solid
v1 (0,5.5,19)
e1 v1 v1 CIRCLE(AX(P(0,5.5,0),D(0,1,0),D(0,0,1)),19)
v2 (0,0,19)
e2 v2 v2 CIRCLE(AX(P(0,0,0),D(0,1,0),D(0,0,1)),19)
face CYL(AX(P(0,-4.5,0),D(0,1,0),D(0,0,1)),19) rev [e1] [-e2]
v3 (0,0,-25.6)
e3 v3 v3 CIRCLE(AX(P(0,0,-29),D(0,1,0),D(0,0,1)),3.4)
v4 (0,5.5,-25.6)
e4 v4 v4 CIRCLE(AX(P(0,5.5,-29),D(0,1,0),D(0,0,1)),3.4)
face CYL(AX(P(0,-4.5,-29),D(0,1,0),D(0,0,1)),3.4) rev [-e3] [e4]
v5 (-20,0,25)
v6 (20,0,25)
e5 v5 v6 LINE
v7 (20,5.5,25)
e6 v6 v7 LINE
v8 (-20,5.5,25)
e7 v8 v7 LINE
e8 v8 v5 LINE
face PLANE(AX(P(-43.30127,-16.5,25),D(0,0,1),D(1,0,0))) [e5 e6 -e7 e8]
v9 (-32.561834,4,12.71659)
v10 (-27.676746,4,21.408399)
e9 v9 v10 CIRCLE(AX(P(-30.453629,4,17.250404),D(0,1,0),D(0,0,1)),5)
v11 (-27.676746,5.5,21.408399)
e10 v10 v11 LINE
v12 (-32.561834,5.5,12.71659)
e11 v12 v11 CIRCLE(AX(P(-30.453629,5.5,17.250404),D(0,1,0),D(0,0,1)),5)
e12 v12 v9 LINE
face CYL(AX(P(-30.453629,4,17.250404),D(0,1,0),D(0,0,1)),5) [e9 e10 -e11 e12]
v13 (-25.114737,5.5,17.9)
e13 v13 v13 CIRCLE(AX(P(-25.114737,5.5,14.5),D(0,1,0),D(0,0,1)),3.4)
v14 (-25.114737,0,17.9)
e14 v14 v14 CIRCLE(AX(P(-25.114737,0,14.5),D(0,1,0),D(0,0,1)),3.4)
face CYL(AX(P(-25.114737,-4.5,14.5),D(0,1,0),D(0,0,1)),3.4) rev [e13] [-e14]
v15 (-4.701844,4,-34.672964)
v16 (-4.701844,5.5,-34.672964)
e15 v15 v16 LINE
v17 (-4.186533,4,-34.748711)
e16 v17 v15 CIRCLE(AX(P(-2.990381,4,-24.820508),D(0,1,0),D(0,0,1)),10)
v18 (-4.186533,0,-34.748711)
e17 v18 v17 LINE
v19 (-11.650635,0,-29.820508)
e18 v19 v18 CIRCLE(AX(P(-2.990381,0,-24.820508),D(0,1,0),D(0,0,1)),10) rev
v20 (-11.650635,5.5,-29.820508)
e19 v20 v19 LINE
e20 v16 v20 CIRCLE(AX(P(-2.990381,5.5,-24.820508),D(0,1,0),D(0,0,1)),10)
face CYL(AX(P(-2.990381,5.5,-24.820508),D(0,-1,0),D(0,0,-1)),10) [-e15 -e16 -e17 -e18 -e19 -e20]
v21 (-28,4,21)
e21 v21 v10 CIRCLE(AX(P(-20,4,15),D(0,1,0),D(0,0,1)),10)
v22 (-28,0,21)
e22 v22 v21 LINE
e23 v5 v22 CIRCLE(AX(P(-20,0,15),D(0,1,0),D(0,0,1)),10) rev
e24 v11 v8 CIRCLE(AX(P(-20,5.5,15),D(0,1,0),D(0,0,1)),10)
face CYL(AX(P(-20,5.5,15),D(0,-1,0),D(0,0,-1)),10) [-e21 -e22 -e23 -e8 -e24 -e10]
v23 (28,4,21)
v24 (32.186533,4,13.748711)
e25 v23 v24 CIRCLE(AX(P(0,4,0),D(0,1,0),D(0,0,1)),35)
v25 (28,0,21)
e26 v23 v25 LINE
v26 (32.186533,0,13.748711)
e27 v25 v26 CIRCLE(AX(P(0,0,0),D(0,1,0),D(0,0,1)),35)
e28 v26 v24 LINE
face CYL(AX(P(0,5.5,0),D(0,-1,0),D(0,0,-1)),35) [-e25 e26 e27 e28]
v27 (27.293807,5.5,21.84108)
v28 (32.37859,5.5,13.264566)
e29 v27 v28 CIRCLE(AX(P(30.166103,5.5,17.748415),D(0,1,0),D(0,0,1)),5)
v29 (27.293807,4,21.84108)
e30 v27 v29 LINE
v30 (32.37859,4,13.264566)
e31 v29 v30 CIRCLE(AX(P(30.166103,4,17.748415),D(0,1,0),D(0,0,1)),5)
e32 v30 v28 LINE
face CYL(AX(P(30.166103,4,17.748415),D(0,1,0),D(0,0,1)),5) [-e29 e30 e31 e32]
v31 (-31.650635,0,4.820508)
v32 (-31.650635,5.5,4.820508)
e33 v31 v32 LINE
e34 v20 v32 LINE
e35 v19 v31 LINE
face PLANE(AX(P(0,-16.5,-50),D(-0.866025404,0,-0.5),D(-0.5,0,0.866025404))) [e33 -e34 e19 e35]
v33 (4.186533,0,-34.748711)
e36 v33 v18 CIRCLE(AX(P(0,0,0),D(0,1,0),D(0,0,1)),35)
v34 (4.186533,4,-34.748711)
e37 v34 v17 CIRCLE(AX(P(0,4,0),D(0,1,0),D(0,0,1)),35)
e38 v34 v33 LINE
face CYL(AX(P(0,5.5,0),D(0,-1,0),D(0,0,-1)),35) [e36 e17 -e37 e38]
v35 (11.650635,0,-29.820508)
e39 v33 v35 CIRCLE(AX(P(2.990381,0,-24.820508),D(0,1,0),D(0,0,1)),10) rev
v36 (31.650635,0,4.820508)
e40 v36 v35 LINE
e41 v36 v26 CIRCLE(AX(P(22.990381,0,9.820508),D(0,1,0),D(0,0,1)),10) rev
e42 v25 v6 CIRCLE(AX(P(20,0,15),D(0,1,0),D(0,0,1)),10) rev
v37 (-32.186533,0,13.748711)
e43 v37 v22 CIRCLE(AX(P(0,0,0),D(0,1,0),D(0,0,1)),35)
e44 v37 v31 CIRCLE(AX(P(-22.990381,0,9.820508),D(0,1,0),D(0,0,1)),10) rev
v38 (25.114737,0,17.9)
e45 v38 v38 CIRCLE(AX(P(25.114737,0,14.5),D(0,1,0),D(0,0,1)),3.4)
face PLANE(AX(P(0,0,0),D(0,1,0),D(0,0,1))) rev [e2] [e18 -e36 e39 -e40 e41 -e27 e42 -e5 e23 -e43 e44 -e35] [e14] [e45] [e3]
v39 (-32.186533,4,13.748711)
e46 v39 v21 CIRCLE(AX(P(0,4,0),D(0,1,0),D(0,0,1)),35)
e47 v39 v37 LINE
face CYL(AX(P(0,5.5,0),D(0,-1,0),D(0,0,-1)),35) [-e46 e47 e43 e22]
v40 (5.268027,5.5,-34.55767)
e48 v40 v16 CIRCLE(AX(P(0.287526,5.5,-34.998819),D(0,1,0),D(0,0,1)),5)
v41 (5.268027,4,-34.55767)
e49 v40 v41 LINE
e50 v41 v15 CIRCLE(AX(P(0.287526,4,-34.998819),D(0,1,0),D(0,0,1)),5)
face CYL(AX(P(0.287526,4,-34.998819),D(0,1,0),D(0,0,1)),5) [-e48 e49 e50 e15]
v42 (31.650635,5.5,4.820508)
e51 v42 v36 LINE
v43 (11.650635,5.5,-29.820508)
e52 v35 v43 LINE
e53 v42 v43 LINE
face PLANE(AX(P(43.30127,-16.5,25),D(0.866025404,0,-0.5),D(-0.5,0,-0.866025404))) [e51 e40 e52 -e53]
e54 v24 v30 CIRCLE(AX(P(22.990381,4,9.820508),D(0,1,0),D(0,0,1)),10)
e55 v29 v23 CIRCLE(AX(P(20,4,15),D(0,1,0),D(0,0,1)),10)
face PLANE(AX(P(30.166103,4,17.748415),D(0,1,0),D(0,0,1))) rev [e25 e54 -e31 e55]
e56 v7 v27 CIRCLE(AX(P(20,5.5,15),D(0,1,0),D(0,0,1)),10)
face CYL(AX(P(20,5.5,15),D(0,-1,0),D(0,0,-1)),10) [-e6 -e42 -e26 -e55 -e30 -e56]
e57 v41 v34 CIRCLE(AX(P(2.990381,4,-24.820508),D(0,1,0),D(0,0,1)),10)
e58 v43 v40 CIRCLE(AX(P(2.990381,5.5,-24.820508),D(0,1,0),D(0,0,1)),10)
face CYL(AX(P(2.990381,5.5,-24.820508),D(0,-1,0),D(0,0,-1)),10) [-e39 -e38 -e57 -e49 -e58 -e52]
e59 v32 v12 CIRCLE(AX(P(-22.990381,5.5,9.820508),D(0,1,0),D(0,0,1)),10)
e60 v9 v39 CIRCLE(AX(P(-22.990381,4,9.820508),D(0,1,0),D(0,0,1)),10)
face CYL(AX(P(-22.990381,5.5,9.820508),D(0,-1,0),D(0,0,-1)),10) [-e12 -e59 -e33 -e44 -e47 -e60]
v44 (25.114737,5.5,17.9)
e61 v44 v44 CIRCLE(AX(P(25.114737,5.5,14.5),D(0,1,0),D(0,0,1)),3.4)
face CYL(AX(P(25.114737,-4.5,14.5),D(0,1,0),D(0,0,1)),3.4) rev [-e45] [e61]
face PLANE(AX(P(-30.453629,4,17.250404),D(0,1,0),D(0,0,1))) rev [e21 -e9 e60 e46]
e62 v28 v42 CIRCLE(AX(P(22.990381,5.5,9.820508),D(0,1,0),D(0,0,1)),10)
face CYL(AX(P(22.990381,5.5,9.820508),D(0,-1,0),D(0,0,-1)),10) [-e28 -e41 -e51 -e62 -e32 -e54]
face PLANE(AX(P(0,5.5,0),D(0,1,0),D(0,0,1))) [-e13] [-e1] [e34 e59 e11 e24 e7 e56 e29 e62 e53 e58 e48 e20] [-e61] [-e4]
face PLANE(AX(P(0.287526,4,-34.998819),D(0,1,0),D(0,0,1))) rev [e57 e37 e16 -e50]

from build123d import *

# Parameters (mm, degrees)
SKETCH1_R                = 17.5
BOSS_EXTRUDE1_DEPTH      = 5.5
SKETCH2_R                = 35
SKETCH2_R_2              = 17.5
SKETCH2_R_3              = 2.8
BOSS_EXTRUDE2_DEPTH      = 5.5
BOSS_EXTRUDE3_DEPTH      = 2
BOSS_EXTRUDE3_DEPTH_BACK = 5.5
SKETCH4_R                = 2.9
SKETCH5_R                = 5
BOSS_EXTRUDE4_DEPTH      = 1.5
SKETCH3_R                = 17.5
CUT_EXTRUDE1_DEPTH       = 10
SKETCH12_R               = 72.135852014
CUT_EXTRUDE2_DEPTH       = 22
FILLET1_R                = 10
SKETCH13_R               = 3.4
CUT_EXTRUDE3_DEPTH       = 10
SKETCH14_R               = 19
CUT_EXTRUDE4_DEPTH       = 10


with BuildPart() as part:
    # Sketch1 → Boss-Extrude1 (new body)
    with BuildSketch(Plane(origin=(0, 0, 0), x_dir=(1, 0, 0), z_dir=(0, 1, 0))):
        with Locations(Location((0, 0, 0), (0, 0, 270))):
            Circle(SKETCH1_R)
    extrude(amount=BOSS_EXTRUDE1_DEPTH)

    # Sketch2 → Boss-Extrude2 (add)
    with BuildSketch(Plane(origin=(0, 0, 0), x_dir=(1, 0, 0), z_dir=(0, 1, 0))):
        with Locations(Location((0, 0, 0), (0, 0, 270))):
            Circle(SKETCH2_R)
        Circle(SKETCH2_R_2, mode=Mode.SUBTRACT)
        with Locations(Location((0, 29, 0), (0, 0, 270))):
            Circle(SKETCH2_R_3, mode=Mode.SUBTRACT)
        with Locations(Location((25.11473671, -14.5, 0), (0, 0, 270))):
            Circle(SKETCH2_R_3, mode=Mode.SUBTRACT)
        with Locations(Location((-25.11473671, -14.5, 0), (0, 0, 270))):
            Circle(SKETCH2_R_3, mode=Mode.SUBTRACT)
    extrude(amount=BOSS_EXTRUDE2_DEPTH)

    # Sketch4 → Boss-Extrude3 (add, two sides: drawn at the far end of the back side and taken through both)
    with BuildSketch(Plane.XZ.offset(-BOSS_EXTRUDE3_DEPTH_BACK)):
        with Locations(Location((-25.11473671, 14.5, 0), (0, 0, 270))):
            Circle(SKETCH4_R)
        with Locations(Location((25.11473671, 14.5, 0), (0, 0, 270))):
            Circle(SKETCH4_R)
        with Locations(Location((0, -29, 0), (0, 0, 270))):
            Circle(SKETCH4_R)
    extrude(amount=BOSS_EXTRUDE3_DEPTH + BOSS_EXTRUDE3_DEPTH_BACK)

    # Sketch5 → Boss-Extrude4 (add)
    with BuildSketch(Plane(origin=(0, 5.5, 0), x_dir=(1, 0, 0), z_dir=(0, 1, 0))):
        with Locations((-30.453629482, -17.250404383)):
            Circle(SKETCH5_R)
        with Locations((0.28752632, 34.99881896)):
            Circle(SKETCH5_R)
        with Locations((30.166103162, -17.748414577)):
            Circle(SKETCH5_R)
    extrude(amount=-BOSS_EXTRUDE4_DEPTH)

    # Sketch3 → Cut-Extrude1 (cut)
    with BuildSketch(Plane(origin=(0, 5.5, 0), x_dir=(1, 0, 0), z_dir=(0, 1, 0))):
        with Locations(Location((0, 0, 0), (0, 0, 270))):
            Circle(SKETCH3_R)
    extrude(amount=-CUT_EXTRUDE1_DEPTH, mode=Mode.SUBTRACT)

    # Sketch12 → Cut-Extrude2 (cut)
    with BuildSketch(Plane(origin=(0, 5.5, 0), x_dir=(1, 0, 0), z_dir=(0, 1, 0))):
        Circle(SKETCH12_R)
        Polygon((0, 50), (-43.301270189, -25), (43.301270189, -25), align=None, mode=Mode.SUBTRACT)
    extrude(amount=-CUT_EXTRUDE2_DEPTH, mode=Mode.SUBTRACT)

    # Fillet1
    # the kernel refuses this fillet: 10 mm, written as the material it takes off along each edge
    with BuildSketch(Plane(origin=(-24.494897428, 18.7960859, 25), x_dir=(1, 0, 0), z_dir=(0, -1, 0))) as fillet1_piece_1_section:
        with BuildLine():
            CenterArc((4.494897428, -10), FILLET1_R, 90, 53.130102354)
            ThreePointArc((-3.505102572, -4), (-1.828638885, -1.933326291), (0, 0))
            Line((0, 0), (4.494897428, 0))
        make_face()
    fillet1_piece_1 = extrude(amount=32.0921718, mode=Mode.PRIVATE)
    fillet1_piece_1 = fillet1_piece_1 - Plane(origin=(-30.453629482, 4.75, 17.250404383), x_dir=(1, 0, 0), z_dir=(0, 1, 0)) * Cylinder(5, 83, mode=Mode.PRIVATE)
    add(fillet1_piece_1, mode=Mode.SUBTRACT)
    with BuildSketch(Plane(origin=(-24.494897428, 18.7960859, 25), x_dir=(1, 0, 0), z_dir=(0, -1, 0))) as fillet1_piece_2_section:
        with BuildLine():
            CenterArc((4.494897428, -10), FILLET1_R, 90, 53.130102354)
            ThreePointArc((-3.505102572, -4), (-1.828638885, -1.933326291), (0, 0))
            Line((0, 0), (4.494897428, 0))
        make_face()
    fillet1_piece_2 = extrude(amount=32.0921718, mode=Mode.PRIVATE)
    fillet1_piece_2 = split(fillet1_piece_2, bisect_by=Plane(origin=(-27.761621835, 4, 21.309124186), z_dir=(0, -1, 0)), keep=Keep.TOP, mode=Mode.PRIVATE)
    add(fillet1_piece_2, mode=Mode.SUBTRACT)
    with BuildSketch(Plane(origin=(24.494897428, 18.7960859, 25), x_dir=(-1, 0, 0), z_dir=(0, -1, 0))) as fillet1_piece_3_section:
        with BuildLine():
            CenterArc((4.494897428, 10), FILLET1_R, 216.869897646, 53.130102354)
            ThreePointArc((-3.505102572, 4), (-1.828638885, 1.933326291), (0, 0))
            Line((0, 0), (4.494897428, 0))
        make_face()
    fillet1_piece_3 = extrude(amount=32.0921718, mode=Mode.PRIVATE)
    fillet1_piece_3 = fillet1_piece_3 - Plane(origin=(30.166103162, 4.75, 17.748414577), x_dir=(1, 0, 0), z_dir=(0, 1, 0)) * Cylinder(5, 83, mode=Mode.PRIVATE)
    add(fillet1_piece_3, mode=Mode.SUBTRACT)
    with BuildSketch(Plane(origin=(24.494897428, 18.7960859, 25), x_dir=(-1, 0, 0), z_dir=(0, -1, 0))) as fillet1_piece_4_section:
        with BuildLine():
            CenterArc((4.494897428, 10), FILLET1_R, 216.869897646, 53.130102354)
            ThreePointArc((-3.505102572, 4), (-1.828638885, 1.933326291), (0, 0))
            Line((0, 0), (4.494897428, 0))
        make_face()
    fillet1_piece_4 = extrude(amount=32.0921718, mode=Mode.PRIVATE)
    fillet1_piece_4 = split(fillet1_piece_4, bisect_by=Plane(origin=(27.488157838, 4, 21.643747381), z_dir=(0, -1, 0)), keep=Keep.TOP, mode=Mode.PRIVATE)
    add(fillet1_piece_4, mode=Mode.SUBTRACT)
    with BuildSketch(Plane(origin=(-9.403186381, 18.7960859, -33.713203436), x_dir=(-0.5000000000000003, 0, 0.8660254037844386), z_dir=(0, -1, 0))) as fillet1_piece_5_section:
        with BuildLine():
            CenterArc((4.494897428, -10), FILLET1_R, 90, 53.130102354)
            ThreePointArc((-3.505102572, -4), (-1.828638885, -1.933326291), (0, 0))
            Line((0, 0), (4.494897428, 0))
        make_face()
    fillet1_piece_5 = extrude(amount=32.0921718, mode=Mode.PRIVATE)
    fillet1_piece_5 = fillet1_piece_5 - Plane(origin=(0.28752632, 4.75, -34.99881896), x_dir=(1, 0, 0), z_dir=(0, 1, 0)) * Cylinder(5, 83, mode=Mode.PRIVATE)
    add(fillet1_piece_5, mode=Mode.SUBTRACT)
    with BuildSketch(Plane(origin=(-9.403186381, 18.7960859, -33.713203436), x_dir=(-0.5000000000000003, 0, 0.8660254037844386), z_dir=(0, -1, 0))) as fillet1_piece_6_section:
        with BuildLine():
            CenterArc((4.494897428, -10), FILLET1_R, 90, 53.130102354)
            ThreePointArc((-3.505102572, -4), (-1.828638885, -1.933326291), (0, 0))
            Line((0, 0), (4.494897428, 0))
        make_face()
    fillet1_piece_6 = extrude(amount=32.0921718, mode=Mode.PRIVATE)
    fillet1_piece_6 = split(fillet1_piece_6, bisect_by=Plane(origin=(-4.57343196, 4, -34.696831852), z_dir=(0, -1, 0)), keep=Keep.TOP, mode=Mode.PRIVATE)
    add(fillet1_piece_6, mode=Mode.SUBTRACT)
    with BuildSketch(Plane(origin=(-33.898083809, 18.7960859, 8.713203436), x_dir=(0.32181469455231854, 0, 0.9468026734067654), z_dir=(0, -1, 0))) as fillet1_piece_7_section:
        with BuildLine():
            CenterArc((4.558658023, -9.971095222), FILLET1_R, 85.642603122, 53.130102354)
            Line((-2.962352352, -3.380617019), (0, 0))
            ThreePointArc((0, 0), (2.65921718, 0.101166725), (5.31843436, 0))
        make_face()
    fillet1_piece_7 = extrude(amount=32.0921718, mode=Mode.PRIVATE)
    fillet1_piece_7 = fillet1_piece_7 - Plane(origin=(-30.453629482, 4.75, 17.250404383), x_dir=(1, 0, 0), z_dir=(0, 1, 0)) * Cylinder(5, 86, mode=Mode.PRIVATE)
    add(fillet1_piece_7, mode=Mode.SUBTRACT)
    with BuildSketch(Plane(origin=(-33.898083809, 18.7960859, 8.713203436), x_dir=(0.32181469455231854, 0, 0.9468026734067654), z_dir=(0, -1, 0))) as fillet1_piece_8_section:
        with BuildLine():
            CenterArc((4.558658023, -9.971095222), FILLET1_R, 85.642603122, 53.130102354)
            Line((-2.962352352, -3.380617019), (0, 0))
            ThreePointArc((0, 0), (2.65921718, 0.101166725), (5.31843436, 0))
        make_face()
    fillet1_piece_8 = extrude(amount=32.0921718, mode=Mode.PRIVATE)
    fillet1_piece_8 = split(fillet1_piece_8, bisect_by=Plane(origin=(-32.488113984, 4, 12.9835693), z_dir=(0, -1, 0)), keep=Keep.TOP, mode=Mode.PRIVATE)
    add(fillet1_piece_8, mode=Mode.SUBTRACT)
    with BuildSketch(Plane(origin=(33.898083809, 18.7960859, 8.713203436), x_dir=(-0.5000000000000012, 0, -0.8660254037844382), z_dir=(0, -1, 0))) as fillet1_piece_9_section:
        with BuildLine():
            CenterArc((4.494897428, -10), FILLET1_R, 90, 53.130102354)
            ThreePointArc((-3.505102572, -4), (-1.828638885, -1.933326291), (0, 0))
            Line((0, 0), (4.494897428, 0))
        make_face()
    fillet1_piece_9 = extrude(amount=32.0921718, mode=Mode.PRIVATE)
    fillet1_piece_9 = fillet1_piece_9 - Plane(origin=(30.166103162, 4.75, 17.748414577), x_dir=(1, 0, 0), z_dir=(0, 1, 0)) * Cylinder(5, 83, mode=Mode.PRIVATE)
    add(fillet1_piece_9, mode=Mode.SUBTRACT)
    with BuildSketch(Plane(origin=(33.898083809, 18.7960859, 8.713203436), x_dir=(-0.5000000000000012, 0, -0.8660254037844382), z_dir=(0, -1, 0))) as fillet1_piece_10_section:
        with BuildLine():
            CenterArc((4.494897428, -10), FILLET1_R, 90, 53.130102354)
            ThreePointArc((-3.505102572, -4), (-1.828638885, -1.933326291), (0, 0))
            Line((0, 0), (4.494897428, 0))
        make_face()
    fillet1_piece_10 = extrude(amount=32.0921718, mode=Mode.PRIVATE)
    fillet1_piece_10 = split(fillet1_piece_10, bisect_by=Plane(origin=(32.335053795, 4, 13.387707666), z_dir=(0, -1, 0)), keep=Keep.TOP, mode=Mode.PRIVATE)
    add(fillet1_piece_10, mode=Mode.SUBTRACT)
    with BuildSketch(Plane(origin=(9.403186381, 18.7960859, -33.713203436), x_dir=(-0.9808625148174394, 0, -0.19470163590994477), z_dir=(0, -1, 0))) as fillet1_piece_11_section:
        with BuildLine():
            CenterArc((4.558658023, -9.971095222), FILLET1_R, 85.642603122, 53.130102354)
            Line((-2.962352352, -3.380617019), (0, 0))
            ThreePointArc((0, 0), (2.65921718, 0.101166725), (5.31843436, 0))
        make_face()
    fillet1_piece_11 = extrude(amount=32.0921718, mode=Mode.PRIVATE)
    fillet1_piece_11 = fillet1_piece_11 - Plane(origin=(0.28752632, 4.75, -34.99881896), x_dir=(1, 0, 0), z_dir=(0, 1, 0)) * Cylinder(5, 86, mode=Mode.PRIVATE)
    add(fillet1_piece_11, mode=Mode.SUBTRACT)
    with BuildSketch(Plane(origin=(9.403186381, 18.7960859, -33.713203436), x_dir=(-0.9808625148174394, 0, -0.19470163590994477), z_dir=(0, -1, 0))) as fillet1_piece_12_section:
        with BuildLine():
            CenterArc((4.558658023, -9.971095222), FILLET1_R, 85.642603122, 53.130102354)
            Line((-2.962352352, -3.380617019), (0, 0))
            ThreePointArc((0, 0), (2.65921718, 0.101166725), (5.31843436, 0))
        make_face()
    fillet1_piece_12 = extrude(amount=32.0921718, mode=Mode.PRIVATE)
    fillet1_piece_12 = split(fillet1_piece_12, bisect_by=Plane(origin=(4.999956146, 4, -34.627316681), z_dir=(0, -1, 0)), keep=Keep.TOP, mode=Mode.PRIVATE)
    add(fillet1_piece_12, mode=Mode.SUBTRACT)

    # Sketch13 → Cut-Extrude3 (cut)
    with BuildSketch(Plane(origin=(0, 5.5, 0), x_dir=(1, 0, 0), z_dir=(0, 1, 0))):
        with Locations(Location((0, 29, 0), (0, 0, 270))):
            Circle(SKETCH13_R)
        with Locations(Location((25.11473671, -14.5, 0), (0, 0, 270))):
            Circle(SKETCH13_R)
        with Locations(Location((-25.11473671, -14.5, 0), (0, 0, 270))):
            Circle(SKETCH13_R)
    extrude(amount=-CUT_EXTRUDE3_DEPTH, mode=Mode.SUBTRACT)

    # Sketch14 → Cut-Extrude4 (cut)
    with BuildSketch(Plane(origin=(0, 5.5, 0), x_dir=(1, 0, 0), z_dir=(0, 1, 0))):
        with Locations(Location((0, 0, 0), (0, 0, 270))):
            Circle(SKETCH14_R)
    extrude(amount=-CUT_EXTRUDE4_DEPTH, mode=Mode.SUBTRACT)


solid = part.part
